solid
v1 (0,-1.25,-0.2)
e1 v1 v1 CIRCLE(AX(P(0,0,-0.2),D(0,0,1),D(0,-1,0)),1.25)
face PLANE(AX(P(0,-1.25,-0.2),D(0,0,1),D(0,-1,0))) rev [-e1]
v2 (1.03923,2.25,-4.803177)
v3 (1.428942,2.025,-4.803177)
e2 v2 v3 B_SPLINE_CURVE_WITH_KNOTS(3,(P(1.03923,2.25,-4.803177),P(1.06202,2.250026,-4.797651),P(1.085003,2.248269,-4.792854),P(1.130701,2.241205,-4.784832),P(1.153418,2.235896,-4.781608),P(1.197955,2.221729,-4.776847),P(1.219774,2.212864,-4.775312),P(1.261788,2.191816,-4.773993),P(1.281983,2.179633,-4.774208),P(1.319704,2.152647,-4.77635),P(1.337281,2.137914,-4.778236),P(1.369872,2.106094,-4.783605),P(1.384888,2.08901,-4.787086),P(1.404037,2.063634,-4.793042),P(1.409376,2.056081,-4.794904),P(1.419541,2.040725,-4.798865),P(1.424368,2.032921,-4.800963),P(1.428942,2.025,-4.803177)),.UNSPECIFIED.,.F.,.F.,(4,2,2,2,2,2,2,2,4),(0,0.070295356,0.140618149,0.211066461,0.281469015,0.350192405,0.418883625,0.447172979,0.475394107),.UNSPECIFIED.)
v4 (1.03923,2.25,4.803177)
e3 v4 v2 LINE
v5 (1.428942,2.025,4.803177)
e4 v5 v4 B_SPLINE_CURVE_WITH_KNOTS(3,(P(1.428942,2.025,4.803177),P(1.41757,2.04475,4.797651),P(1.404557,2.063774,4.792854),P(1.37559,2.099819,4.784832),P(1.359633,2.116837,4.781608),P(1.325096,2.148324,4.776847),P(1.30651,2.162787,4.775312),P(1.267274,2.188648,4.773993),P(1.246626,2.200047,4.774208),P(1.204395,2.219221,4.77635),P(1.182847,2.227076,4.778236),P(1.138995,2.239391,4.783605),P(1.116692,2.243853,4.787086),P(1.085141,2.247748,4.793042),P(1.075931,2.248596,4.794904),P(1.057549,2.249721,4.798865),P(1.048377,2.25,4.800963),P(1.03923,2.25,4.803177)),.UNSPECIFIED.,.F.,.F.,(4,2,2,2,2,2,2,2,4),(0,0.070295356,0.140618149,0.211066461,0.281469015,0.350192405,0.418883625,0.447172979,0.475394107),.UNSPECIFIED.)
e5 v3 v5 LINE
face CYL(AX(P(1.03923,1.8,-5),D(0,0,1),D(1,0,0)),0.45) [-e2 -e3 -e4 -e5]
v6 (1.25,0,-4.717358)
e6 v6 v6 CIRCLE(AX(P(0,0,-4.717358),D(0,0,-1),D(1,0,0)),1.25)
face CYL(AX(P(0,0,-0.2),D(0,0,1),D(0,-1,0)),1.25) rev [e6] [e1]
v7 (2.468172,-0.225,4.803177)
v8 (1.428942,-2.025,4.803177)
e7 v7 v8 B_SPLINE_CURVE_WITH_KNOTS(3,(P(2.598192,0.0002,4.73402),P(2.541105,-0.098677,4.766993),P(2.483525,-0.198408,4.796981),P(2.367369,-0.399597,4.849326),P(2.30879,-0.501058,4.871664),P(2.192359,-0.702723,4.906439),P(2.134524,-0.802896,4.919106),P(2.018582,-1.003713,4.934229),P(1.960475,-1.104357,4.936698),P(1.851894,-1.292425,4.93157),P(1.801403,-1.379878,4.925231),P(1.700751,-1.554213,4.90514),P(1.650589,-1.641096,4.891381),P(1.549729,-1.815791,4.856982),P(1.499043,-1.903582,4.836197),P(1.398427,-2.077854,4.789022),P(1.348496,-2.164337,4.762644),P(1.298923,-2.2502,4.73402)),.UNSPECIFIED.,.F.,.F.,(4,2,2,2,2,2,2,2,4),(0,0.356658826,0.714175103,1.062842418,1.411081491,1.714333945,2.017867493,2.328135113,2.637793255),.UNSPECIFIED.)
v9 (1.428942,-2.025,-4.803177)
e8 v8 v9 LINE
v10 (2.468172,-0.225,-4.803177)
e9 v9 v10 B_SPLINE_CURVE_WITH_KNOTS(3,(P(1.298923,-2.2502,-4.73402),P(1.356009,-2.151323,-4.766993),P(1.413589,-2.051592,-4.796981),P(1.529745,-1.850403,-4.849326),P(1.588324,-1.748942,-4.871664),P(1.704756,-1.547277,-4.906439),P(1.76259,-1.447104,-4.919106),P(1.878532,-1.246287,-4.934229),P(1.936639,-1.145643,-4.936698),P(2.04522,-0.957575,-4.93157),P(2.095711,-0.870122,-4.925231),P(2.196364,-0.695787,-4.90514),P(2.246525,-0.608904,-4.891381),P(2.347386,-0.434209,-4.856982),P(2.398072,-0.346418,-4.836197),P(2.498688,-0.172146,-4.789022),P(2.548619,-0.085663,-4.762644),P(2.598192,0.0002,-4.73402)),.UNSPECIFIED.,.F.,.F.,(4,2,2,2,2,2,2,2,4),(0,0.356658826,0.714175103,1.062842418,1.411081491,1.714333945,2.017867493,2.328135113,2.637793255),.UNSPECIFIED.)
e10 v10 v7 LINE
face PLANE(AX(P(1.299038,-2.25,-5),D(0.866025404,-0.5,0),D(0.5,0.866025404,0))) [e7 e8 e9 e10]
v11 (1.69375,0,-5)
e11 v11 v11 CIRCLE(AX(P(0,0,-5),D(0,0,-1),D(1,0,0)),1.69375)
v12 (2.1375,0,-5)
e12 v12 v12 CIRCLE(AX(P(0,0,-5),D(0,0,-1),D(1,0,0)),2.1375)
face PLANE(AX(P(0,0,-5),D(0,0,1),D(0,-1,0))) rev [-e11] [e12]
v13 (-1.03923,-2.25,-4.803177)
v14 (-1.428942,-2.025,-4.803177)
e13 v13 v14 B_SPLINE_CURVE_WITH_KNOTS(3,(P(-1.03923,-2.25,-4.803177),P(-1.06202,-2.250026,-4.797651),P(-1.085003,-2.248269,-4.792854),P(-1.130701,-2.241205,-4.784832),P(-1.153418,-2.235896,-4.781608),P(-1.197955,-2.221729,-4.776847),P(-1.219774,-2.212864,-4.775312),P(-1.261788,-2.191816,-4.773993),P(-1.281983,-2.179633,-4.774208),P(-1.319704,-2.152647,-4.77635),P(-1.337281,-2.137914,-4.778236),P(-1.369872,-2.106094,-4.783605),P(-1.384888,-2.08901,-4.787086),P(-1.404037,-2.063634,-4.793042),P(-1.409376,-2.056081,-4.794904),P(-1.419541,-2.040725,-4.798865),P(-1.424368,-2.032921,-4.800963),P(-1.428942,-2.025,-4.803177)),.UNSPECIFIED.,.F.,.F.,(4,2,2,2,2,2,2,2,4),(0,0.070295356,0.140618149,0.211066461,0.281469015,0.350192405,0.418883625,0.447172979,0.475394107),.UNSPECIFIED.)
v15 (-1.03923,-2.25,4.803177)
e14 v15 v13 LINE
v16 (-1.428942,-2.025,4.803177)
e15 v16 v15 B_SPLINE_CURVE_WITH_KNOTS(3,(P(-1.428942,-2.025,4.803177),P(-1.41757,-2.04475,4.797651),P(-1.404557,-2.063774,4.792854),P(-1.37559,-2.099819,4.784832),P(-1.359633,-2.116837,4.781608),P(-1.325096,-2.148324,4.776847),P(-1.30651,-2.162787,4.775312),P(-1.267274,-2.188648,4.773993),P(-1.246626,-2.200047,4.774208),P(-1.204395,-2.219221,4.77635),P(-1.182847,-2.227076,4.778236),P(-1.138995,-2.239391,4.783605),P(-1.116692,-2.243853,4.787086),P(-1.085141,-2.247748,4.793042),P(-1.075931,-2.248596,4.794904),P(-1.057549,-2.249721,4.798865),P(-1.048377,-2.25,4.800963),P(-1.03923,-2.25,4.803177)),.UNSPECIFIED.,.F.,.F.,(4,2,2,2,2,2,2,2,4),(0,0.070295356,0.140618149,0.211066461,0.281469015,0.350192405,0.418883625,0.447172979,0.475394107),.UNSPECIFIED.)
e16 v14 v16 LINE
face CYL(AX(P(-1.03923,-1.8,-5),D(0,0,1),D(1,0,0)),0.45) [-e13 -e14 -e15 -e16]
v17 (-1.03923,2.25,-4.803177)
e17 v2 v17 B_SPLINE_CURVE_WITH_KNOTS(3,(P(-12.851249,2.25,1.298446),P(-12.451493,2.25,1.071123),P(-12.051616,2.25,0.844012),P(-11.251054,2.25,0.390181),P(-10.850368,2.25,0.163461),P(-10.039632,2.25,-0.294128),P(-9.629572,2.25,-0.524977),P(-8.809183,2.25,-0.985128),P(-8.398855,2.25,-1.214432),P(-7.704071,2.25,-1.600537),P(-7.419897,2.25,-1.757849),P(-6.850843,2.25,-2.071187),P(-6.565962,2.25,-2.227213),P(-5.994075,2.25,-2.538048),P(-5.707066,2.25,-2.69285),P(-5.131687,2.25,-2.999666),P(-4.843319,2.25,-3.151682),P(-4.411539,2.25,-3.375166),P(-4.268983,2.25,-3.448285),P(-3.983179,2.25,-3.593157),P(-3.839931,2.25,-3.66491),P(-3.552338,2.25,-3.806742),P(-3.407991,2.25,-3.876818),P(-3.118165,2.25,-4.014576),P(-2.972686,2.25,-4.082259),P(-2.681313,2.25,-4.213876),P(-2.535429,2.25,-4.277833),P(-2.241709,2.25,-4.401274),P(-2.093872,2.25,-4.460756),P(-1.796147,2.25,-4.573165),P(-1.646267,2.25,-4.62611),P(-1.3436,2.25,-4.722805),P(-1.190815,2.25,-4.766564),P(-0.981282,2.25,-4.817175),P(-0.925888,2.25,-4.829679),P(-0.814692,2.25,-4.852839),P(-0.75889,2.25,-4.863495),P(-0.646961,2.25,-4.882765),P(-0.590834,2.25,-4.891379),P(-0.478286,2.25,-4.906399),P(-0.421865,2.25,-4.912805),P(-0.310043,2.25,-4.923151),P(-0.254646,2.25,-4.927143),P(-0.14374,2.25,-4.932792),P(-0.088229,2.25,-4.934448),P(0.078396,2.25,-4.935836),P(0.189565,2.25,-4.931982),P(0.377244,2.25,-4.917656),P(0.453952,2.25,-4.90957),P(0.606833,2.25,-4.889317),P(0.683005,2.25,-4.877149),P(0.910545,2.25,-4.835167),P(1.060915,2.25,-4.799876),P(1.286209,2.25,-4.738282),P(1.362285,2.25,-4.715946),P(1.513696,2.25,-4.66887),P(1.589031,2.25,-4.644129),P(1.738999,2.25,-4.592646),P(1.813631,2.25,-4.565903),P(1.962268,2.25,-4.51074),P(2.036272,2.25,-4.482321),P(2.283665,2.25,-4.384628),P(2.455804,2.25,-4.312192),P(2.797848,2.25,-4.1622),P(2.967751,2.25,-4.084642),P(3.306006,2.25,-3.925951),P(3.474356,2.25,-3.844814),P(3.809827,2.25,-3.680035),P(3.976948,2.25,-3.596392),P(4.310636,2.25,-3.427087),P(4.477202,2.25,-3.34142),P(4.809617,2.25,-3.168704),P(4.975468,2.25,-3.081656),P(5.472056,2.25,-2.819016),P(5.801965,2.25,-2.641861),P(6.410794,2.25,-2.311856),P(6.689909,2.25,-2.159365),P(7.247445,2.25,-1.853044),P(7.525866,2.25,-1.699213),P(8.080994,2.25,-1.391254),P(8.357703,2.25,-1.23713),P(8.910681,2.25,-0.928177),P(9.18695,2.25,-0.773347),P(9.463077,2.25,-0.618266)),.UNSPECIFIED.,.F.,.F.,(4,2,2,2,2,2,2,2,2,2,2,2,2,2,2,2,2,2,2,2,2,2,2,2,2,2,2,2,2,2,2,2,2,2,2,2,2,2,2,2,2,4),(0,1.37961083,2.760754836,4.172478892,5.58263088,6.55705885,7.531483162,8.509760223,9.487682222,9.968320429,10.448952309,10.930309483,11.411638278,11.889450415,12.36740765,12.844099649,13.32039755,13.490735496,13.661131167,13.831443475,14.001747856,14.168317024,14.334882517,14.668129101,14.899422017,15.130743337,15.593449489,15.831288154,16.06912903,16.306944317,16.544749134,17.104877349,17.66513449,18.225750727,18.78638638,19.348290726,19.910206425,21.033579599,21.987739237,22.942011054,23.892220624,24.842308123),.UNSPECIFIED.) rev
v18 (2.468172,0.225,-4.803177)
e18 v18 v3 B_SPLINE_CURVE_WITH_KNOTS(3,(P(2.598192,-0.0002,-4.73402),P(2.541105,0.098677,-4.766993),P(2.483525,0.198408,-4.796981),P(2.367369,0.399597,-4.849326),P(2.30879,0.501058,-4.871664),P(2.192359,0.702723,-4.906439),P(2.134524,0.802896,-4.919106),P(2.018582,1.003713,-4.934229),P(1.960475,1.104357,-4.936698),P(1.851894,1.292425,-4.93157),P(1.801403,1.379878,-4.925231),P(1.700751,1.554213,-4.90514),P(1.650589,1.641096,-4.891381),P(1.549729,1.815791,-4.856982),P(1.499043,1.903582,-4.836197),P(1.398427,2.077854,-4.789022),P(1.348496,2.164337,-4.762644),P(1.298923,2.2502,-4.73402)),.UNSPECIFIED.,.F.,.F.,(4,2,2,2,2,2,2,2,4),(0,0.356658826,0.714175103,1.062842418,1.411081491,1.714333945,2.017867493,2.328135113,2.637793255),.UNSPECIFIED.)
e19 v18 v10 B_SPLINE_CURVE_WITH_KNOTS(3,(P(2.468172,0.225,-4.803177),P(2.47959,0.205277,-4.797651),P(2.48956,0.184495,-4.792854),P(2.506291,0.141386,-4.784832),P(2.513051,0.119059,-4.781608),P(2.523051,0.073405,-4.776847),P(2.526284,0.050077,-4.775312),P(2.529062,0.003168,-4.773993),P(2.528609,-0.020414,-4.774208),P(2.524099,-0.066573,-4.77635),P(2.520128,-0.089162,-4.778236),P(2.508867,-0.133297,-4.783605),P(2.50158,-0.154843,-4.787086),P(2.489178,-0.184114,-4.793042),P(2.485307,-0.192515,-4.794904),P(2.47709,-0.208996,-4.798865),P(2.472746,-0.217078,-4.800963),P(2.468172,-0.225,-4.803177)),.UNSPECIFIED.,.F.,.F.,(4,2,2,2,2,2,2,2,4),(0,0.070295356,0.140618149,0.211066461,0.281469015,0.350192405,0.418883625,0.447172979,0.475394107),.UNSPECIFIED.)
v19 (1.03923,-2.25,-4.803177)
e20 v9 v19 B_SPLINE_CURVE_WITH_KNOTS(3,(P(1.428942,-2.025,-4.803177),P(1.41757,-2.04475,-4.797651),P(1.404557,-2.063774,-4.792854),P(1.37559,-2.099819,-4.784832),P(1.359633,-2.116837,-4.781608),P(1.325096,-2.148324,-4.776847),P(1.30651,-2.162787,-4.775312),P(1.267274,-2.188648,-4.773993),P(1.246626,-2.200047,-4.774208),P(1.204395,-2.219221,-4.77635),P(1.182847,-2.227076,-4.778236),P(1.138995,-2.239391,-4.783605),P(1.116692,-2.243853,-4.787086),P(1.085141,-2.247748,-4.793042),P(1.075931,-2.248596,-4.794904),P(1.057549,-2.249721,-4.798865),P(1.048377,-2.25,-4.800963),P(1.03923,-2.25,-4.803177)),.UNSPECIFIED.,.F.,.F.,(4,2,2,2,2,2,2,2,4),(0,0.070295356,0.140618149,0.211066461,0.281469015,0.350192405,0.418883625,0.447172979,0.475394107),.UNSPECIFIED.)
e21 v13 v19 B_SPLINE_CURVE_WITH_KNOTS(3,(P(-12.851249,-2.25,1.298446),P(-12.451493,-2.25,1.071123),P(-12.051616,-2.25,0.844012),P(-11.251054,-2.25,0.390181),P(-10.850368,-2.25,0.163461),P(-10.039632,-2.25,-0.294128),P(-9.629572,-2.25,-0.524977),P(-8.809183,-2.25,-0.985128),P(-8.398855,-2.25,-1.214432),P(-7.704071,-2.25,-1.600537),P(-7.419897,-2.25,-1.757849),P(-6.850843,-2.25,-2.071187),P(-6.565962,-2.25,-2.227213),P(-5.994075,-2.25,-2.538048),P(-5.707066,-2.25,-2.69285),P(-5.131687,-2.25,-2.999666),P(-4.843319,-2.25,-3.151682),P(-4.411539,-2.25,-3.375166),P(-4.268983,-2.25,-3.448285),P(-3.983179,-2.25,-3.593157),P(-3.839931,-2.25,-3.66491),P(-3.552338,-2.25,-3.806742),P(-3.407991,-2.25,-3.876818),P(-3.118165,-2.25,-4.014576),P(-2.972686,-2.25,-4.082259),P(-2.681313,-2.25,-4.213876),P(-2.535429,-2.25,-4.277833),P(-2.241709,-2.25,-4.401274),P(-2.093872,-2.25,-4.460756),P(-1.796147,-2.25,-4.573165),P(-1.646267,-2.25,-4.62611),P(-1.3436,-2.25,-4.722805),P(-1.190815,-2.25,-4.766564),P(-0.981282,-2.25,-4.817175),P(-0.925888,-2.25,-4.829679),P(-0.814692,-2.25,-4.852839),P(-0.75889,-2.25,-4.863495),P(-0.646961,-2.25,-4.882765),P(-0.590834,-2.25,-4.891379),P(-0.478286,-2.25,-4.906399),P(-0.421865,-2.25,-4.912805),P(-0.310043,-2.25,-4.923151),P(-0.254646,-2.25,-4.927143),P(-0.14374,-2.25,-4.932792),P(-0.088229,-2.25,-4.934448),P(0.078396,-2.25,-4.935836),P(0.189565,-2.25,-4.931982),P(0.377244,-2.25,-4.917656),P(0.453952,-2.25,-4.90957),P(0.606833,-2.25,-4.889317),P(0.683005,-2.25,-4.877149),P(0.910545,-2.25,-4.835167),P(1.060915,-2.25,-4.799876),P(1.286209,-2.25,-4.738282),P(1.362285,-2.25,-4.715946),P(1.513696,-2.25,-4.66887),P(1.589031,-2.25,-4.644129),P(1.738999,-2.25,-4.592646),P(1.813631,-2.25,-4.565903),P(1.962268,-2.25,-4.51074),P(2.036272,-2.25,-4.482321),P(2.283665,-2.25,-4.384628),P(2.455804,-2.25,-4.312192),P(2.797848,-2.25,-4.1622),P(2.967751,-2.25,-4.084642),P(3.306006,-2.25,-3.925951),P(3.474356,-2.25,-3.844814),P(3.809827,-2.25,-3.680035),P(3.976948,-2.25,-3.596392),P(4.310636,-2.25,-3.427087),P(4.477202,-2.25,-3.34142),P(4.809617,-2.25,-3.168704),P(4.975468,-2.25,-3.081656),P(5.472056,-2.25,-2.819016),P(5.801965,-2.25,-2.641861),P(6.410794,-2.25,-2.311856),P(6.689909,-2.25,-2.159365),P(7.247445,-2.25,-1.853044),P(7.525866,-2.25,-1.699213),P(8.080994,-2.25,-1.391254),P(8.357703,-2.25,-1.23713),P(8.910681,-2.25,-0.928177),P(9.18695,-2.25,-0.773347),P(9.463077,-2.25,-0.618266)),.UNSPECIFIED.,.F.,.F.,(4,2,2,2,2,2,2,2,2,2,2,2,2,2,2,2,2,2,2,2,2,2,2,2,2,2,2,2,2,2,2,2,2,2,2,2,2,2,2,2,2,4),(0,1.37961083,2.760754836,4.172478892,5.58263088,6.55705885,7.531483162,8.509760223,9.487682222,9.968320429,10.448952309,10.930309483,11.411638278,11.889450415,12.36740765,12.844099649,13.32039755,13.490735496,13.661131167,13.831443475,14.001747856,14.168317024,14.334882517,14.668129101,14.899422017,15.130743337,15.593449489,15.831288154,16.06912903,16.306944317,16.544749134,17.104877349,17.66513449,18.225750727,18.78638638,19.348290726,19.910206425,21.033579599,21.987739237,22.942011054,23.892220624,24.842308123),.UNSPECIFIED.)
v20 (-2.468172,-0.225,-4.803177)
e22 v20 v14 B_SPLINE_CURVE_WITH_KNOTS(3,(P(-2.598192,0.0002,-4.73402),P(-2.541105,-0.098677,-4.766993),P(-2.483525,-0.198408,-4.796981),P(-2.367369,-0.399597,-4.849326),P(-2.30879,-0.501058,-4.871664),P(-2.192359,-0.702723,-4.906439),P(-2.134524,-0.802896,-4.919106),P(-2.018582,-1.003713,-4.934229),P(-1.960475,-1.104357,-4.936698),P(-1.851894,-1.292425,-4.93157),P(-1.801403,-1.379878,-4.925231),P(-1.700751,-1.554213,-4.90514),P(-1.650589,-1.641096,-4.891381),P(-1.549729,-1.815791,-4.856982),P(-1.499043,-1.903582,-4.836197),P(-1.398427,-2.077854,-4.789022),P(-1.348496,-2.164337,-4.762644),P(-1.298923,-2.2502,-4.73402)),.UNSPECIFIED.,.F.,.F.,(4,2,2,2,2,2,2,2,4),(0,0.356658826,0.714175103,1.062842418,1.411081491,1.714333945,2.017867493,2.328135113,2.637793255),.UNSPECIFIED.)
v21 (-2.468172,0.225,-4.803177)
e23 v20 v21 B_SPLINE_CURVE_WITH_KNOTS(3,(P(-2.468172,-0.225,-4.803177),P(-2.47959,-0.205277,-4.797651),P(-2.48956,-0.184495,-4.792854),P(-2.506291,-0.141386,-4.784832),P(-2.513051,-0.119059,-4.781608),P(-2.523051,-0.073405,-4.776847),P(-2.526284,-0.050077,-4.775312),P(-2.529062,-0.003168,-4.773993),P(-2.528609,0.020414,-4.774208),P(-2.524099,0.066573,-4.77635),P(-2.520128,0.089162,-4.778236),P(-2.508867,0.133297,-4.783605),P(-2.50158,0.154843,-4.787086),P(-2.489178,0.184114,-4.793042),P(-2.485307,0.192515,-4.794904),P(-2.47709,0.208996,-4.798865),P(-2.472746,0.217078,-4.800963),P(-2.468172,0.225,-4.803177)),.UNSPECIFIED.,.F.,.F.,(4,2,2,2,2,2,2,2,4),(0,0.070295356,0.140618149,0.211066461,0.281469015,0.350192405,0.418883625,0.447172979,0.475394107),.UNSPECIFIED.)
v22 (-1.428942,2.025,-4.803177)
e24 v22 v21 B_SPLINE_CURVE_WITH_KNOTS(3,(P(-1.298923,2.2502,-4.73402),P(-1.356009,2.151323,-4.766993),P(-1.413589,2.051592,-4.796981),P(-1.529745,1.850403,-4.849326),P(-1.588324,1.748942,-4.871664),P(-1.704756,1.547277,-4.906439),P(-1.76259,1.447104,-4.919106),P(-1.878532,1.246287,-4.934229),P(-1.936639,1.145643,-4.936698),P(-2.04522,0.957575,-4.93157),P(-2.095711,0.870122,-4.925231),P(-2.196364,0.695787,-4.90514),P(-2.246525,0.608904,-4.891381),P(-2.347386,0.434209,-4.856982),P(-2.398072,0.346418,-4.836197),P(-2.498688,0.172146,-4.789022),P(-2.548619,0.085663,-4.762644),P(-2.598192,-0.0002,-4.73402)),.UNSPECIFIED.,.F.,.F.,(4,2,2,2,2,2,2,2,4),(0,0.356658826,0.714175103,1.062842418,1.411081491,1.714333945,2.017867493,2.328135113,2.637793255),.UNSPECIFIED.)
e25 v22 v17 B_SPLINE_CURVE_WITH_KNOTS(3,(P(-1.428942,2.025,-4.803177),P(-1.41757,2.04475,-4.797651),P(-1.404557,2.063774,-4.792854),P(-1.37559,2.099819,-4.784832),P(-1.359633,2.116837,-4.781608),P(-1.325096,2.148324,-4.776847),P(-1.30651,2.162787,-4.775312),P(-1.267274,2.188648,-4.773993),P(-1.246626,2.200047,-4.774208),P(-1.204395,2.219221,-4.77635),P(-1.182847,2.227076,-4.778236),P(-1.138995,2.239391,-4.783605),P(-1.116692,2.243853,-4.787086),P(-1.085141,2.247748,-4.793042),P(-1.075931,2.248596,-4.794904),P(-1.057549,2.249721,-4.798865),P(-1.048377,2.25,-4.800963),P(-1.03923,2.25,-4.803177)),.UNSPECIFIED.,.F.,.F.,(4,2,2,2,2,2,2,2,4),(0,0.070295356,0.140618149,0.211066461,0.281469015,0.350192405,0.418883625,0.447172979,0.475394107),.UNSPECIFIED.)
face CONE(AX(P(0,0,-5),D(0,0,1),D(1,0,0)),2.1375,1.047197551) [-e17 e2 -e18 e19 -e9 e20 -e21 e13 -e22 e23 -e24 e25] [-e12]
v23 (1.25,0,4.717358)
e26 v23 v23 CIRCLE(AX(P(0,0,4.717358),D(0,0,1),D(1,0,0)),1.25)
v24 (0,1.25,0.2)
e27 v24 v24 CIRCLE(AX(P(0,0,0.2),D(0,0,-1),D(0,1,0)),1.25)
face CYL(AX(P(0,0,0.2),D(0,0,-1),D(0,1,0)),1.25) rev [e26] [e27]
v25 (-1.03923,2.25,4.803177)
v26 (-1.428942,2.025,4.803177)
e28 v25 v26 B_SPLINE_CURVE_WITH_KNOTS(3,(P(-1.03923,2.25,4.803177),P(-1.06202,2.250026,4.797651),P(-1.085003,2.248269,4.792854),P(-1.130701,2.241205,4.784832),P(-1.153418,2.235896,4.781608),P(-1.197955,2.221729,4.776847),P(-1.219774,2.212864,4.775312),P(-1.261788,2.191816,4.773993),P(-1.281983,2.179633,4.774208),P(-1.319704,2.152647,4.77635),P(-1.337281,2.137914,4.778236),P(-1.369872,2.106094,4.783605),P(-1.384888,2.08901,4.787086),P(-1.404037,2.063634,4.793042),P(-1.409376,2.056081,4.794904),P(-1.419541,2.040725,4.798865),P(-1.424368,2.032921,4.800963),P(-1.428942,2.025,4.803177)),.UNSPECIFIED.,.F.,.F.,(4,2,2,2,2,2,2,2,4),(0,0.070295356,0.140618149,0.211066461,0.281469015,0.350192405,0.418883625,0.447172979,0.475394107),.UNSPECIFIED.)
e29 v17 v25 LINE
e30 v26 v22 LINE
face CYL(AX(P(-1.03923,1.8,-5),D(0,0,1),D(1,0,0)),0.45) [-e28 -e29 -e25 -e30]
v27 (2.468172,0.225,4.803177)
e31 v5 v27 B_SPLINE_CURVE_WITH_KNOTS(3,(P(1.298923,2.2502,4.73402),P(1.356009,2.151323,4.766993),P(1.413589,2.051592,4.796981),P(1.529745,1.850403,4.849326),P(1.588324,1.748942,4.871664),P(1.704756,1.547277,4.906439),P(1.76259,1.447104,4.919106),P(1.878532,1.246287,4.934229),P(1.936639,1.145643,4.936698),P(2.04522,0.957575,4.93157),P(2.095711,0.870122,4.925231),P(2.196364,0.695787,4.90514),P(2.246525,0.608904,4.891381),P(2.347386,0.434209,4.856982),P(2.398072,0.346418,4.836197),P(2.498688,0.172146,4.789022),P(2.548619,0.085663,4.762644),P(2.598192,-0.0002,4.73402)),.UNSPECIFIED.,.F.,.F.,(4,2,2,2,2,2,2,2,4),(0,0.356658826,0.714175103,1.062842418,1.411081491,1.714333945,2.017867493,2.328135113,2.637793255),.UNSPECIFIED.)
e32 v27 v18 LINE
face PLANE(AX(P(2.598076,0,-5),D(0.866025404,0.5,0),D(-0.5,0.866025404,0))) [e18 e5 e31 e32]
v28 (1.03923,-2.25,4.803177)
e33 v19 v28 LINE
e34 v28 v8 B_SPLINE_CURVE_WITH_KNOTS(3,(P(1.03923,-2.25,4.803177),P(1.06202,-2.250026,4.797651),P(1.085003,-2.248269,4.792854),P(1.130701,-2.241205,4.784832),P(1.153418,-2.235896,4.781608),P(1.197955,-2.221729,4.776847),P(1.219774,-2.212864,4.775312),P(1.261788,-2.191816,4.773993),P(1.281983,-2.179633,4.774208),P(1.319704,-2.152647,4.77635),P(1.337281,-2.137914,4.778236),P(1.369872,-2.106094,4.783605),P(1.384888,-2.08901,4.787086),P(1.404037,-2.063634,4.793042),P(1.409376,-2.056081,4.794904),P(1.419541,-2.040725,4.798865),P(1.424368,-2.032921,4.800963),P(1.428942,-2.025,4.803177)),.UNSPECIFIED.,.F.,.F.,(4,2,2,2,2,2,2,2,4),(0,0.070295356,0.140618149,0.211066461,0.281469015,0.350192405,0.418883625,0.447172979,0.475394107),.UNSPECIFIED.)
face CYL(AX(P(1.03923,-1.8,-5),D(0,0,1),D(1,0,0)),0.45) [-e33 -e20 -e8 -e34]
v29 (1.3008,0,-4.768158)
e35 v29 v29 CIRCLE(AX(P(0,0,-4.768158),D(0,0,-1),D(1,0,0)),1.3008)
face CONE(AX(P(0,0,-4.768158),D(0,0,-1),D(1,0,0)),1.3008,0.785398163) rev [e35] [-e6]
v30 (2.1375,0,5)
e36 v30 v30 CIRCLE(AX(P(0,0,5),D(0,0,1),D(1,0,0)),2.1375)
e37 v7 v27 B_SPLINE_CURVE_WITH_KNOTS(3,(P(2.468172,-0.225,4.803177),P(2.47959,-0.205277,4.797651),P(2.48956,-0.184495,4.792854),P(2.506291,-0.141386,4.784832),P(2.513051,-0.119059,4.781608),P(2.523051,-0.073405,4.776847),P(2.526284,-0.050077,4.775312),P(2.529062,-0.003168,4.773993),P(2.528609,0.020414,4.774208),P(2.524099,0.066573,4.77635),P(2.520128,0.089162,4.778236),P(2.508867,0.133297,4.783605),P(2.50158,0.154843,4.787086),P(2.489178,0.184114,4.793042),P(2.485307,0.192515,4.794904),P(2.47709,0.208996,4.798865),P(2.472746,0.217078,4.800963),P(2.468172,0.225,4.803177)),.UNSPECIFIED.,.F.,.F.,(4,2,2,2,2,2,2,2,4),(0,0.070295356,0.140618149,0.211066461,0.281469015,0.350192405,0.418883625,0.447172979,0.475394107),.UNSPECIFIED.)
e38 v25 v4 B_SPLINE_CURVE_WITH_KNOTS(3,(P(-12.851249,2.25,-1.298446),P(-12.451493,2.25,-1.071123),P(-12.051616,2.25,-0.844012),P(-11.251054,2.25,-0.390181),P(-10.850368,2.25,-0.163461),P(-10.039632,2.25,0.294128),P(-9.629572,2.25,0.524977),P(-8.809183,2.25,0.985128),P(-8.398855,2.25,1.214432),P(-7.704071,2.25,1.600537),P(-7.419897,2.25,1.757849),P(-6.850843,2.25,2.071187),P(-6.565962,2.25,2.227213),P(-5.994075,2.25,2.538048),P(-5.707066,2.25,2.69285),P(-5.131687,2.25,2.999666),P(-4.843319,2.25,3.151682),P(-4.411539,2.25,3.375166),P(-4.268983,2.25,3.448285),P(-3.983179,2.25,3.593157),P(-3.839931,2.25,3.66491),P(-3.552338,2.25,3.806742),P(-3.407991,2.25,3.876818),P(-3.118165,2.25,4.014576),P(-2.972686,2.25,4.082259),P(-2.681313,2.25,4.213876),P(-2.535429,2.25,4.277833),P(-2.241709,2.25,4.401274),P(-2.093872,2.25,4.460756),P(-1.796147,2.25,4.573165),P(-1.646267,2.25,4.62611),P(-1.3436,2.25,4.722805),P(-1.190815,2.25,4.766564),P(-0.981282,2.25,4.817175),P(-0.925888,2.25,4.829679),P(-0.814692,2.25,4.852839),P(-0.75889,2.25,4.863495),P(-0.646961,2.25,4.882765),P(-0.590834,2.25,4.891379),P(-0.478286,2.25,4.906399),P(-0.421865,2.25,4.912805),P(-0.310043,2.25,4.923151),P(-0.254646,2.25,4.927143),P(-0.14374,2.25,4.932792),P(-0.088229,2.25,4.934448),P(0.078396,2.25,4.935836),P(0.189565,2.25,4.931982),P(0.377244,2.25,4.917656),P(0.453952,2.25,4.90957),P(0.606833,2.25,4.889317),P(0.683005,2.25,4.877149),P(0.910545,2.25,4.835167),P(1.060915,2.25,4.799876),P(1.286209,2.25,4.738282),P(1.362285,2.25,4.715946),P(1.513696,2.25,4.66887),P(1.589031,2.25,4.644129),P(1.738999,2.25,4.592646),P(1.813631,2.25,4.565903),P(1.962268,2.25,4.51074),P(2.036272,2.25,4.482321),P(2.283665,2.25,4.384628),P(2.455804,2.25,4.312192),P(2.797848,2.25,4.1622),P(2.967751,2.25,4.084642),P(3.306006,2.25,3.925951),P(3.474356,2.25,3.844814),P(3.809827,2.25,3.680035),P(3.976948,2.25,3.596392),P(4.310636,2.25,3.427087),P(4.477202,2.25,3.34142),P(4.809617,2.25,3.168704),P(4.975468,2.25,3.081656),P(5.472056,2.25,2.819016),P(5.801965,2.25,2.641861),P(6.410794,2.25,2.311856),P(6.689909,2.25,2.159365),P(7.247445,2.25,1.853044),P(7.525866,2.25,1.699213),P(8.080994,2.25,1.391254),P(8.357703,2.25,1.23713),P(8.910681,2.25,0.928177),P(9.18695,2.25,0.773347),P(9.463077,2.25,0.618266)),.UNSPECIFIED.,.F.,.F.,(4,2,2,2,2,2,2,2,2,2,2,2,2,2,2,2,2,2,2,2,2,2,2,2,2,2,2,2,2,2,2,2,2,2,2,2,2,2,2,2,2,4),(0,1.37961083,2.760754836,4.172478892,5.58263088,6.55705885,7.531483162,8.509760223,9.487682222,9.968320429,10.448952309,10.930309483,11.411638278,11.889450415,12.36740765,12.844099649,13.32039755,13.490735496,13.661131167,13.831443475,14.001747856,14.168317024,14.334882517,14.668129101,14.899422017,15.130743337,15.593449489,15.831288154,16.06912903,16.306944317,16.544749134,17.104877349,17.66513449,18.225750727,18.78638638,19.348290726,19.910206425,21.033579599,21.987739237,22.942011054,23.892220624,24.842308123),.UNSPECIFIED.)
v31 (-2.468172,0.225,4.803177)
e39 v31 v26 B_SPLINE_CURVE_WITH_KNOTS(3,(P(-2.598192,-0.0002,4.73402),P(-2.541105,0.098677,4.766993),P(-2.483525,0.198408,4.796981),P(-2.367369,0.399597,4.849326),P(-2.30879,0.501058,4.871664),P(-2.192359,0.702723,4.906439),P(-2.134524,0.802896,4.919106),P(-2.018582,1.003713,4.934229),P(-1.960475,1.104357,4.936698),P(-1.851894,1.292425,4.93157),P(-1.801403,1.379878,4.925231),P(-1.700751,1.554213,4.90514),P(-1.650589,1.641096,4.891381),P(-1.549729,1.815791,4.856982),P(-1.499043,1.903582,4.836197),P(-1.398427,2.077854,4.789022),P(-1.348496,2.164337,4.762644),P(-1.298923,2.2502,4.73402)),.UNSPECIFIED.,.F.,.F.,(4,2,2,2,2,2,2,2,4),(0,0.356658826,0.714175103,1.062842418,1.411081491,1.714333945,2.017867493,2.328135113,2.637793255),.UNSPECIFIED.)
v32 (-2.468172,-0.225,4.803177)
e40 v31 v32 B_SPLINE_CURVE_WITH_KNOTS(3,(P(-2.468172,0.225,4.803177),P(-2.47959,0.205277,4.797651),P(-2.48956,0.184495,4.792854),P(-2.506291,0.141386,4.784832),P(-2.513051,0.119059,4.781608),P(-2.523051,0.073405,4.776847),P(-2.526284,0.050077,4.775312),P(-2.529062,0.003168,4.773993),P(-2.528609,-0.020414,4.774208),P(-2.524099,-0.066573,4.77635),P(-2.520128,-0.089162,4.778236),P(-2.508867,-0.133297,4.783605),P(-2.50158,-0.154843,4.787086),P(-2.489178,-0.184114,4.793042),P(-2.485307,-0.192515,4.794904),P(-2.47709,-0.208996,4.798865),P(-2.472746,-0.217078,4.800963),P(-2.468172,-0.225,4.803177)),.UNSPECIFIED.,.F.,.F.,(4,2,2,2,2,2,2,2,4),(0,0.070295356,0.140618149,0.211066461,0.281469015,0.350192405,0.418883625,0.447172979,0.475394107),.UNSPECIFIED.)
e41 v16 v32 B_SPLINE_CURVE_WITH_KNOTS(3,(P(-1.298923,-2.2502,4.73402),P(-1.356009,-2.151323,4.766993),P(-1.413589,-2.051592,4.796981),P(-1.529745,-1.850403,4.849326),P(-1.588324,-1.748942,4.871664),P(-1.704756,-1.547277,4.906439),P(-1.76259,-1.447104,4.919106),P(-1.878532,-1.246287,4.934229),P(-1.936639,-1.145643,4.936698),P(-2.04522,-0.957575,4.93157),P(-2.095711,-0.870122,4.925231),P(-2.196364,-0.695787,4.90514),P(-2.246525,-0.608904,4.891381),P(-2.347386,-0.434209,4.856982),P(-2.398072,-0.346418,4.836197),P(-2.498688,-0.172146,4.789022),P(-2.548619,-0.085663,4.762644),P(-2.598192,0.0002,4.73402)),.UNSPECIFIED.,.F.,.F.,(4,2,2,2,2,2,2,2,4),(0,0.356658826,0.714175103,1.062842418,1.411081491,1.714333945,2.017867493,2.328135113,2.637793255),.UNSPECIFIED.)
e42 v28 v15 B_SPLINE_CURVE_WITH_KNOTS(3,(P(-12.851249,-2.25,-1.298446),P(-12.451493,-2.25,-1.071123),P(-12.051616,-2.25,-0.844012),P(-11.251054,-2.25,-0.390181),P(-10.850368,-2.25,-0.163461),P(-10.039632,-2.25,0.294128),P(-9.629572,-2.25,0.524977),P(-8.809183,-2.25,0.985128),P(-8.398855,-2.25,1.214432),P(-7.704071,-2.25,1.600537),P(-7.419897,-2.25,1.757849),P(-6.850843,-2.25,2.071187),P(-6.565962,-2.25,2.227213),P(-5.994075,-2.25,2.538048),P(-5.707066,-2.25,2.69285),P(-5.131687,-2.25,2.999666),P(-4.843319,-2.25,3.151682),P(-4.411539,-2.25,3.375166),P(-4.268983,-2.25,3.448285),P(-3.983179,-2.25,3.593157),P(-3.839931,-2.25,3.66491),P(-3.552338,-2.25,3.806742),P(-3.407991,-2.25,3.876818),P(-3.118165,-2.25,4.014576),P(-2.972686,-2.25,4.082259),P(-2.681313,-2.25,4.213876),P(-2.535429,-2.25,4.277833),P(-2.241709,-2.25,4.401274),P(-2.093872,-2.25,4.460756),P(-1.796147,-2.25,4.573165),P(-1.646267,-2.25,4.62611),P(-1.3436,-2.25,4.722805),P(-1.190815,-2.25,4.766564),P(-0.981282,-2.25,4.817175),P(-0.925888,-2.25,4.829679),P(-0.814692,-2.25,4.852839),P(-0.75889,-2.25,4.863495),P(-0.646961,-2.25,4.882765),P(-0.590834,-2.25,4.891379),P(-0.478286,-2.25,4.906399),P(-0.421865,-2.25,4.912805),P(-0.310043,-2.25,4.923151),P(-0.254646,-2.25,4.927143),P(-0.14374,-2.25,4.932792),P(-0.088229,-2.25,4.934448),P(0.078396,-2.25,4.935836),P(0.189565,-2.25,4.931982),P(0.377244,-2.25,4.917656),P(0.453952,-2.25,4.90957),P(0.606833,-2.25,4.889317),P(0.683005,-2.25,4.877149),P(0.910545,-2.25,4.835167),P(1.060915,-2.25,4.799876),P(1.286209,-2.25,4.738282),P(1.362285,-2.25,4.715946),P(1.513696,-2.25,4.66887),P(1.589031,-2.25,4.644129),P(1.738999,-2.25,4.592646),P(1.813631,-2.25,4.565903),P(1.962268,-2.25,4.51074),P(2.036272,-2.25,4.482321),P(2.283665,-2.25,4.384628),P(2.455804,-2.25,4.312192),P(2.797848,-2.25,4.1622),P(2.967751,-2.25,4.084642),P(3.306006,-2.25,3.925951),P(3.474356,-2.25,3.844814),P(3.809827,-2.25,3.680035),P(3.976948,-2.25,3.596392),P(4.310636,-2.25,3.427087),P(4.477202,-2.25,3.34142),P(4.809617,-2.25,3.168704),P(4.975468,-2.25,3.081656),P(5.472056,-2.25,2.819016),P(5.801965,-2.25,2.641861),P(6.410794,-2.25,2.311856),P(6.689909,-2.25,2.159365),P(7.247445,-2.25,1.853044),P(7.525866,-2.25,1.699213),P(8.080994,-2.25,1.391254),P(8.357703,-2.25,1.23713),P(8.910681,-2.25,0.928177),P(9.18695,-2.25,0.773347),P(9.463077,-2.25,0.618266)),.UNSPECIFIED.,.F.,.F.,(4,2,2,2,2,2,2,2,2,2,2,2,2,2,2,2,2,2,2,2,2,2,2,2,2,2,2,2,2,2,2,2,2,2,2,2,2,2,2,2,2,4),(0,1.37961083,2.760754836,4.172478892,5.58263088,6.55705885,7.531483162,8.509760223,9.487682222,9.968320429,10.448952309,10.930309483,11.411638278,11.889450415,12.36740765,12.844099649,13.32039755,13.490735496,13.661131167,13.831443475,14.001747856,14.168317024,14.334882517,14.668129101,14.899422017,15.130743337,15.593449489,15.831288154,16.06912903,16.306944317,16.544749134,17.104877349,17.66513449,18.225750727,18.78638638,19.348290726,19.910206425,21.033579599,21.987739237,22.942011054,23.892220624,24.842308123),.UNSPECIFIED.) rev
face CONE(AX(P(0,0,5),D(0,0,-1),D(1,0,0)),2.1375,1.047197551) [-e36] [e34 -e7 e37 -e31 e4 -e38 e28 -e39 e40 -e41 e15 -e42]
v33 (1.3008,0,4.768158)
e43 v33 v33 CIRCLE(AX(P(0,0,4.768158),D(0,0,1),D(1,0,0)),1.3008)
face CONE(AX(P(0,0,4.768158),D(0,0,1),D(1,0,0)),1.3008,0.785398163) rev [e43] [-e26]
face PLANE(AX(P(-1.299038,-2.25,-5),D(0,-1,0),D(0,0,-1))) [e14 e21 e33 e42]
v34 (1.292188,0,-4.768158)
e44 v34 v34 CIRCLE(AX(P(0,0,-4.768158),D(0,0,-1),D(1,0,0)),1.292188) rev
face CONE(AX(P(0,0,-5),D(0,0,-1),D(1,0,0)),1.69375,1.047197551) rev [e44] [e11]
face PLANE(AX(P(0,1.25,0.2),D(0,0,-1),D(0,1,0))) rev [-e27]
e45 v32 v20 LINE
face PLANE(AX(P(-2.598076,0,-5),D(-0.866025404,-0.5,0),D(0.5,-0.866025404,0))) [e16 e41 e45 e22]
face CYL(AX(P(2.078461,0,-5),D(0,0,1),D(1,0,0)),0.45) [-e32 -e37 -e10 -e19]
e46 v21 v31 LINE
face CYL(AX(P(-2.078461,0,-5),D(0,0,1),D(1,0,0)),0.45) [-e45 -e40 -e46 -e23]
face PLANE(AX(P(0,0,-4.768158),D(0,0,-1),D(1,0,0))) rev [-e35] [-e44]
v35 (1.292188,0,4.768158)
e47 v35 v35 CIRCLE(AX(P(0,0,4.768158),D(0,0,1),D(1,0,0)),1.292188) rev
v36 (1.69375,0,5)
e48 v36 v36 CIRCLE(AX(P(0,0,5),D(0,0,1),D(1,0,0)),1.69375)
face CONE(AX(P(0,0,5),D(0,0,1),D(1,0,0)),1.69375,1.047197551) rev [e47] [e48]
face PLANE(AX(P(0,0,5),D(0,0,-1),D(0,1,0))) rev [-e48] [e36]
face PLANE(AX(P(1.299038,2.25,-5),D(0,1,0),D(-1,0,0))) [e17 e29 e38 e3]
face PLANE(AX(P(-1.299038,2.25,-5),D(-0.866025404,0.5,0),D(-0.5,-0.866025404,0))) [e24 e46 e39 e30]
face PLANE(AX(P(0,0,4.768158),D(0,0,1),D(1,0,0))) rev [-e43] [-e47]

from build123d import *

# Parameters (mm, degrees)
SKETCH4_R           = 1.75
BOSS_EXTRUDE1_DEPTH = 5
SKETCH5_OUTSIDE_W   = 49.716
SKETCH5_OUTSIDE_H   = 49.02
SKETCH5_OUTSIDE_R   = 2.1375
CUT_EXTRUDE1_DEPTH  = 11.574142991
CUT_EXTRUDE1_DRAFT  = -60
SKETCH6_OUTSIDE_W   = 49.716
SKETCH6_OUTSIDE_H   = 49.02
SKETCH6_OUTSIDE_R   = 2.1375
CUT_EXTRUDE2_DEPTH  = 11.574142991
CUT_EXTRUDE2_DRAFT  = -60
FILLET1_R           = 0.45
BOSS_EXTRUDE2_START = -5
SKETCH7_R           = 1.69375
BOSS_EXTRUDE2_DEPTH = 4.8
SKETCH8_W           = 4.8
SKETCH8_H           = 1.25
CIRPATTERN1_COUNT   = 2


with BuildPart() as part:
    # Sketch3 → Revolve1 (revolve)
    with BuildSketch(Plane(origin=(0, 0, 0), x_dir=(0, 0, -1), z_dir=(1, 0, 0))):
        Polygon((-4.743800818, 1.25), (-0.2, 1.25), (-0.2, 0), (0.2, 0), (0.2, 1.25), (4.743800818, 1.25), (5, 1.69375), (5, 2.25), (0, 2.25), (-5, 2.25), (-5, 1.69375), align=None)
        Polygon((-4.743800818, 1.25), (-0.2, 1.25), (-0.2, 0), (0.2, 0), (0.2, 1.25), (4.743800818, 1.25), (5, 1.69375), (5, 2.25), (0, 2.25), (-5, 2.25), (-5, 1.69375), align=None)
    revolve(axis=Axis((0, 0, 0.2), (0, 0, 1)))

    # Sketch4 → Boss-Extrude1 (add, symmetric)
    with BuildSketch(Plane.XY):
        Polygon((-1.299038106, 2.25), (-2.598076211, 0), (-1.299038106, -2.25), (1.299038106, -2.25), (2.598076211, 0), (1.299038106, 2.25), align=None)
        Circle(SKETCH4_R, mode=Mode.SUBTRACT)
    extrude(amount=BOSS_EXTRUDE1_DEPTH, both=True)


with BuildPart() as cut_extrude1_tool:
    # Sketch5 outside → Cut-Extrude1 (with draft: the straight prism first)
    with BuildSketch(Plane.XY.offset(5)):
        Rectangle(SKETCH5_OUTSIDE_W, SKETCH5_OUTSIDE_H)
        Circle(SKETCH5_OUTSIDE_R, mode=Mode.SUBTRACT)
    extrude(amount=-CUT_EXTRUDE1_DEPTH)
    # Cut-Extrude1: the draft: its side faces are tilted about the plane it starts from
    cut_extrude1_sides = [cut_extrude1_tool.faces().sort_by_distance(p)[0] for p in [
        (0, -24.51, -0.787071496),
        (24.858, 0, -0.787071496),
        (0, 24.51, -0.787071496),
        (-24.858, 0, -0.787071496),
        (-2.1375, 0, -0.787071496),
    ]]
    draft(cut_extrude1_sides, Plane.XY.offset(5), CUT_EXTRUDE1_DRAFT)


with BuildPart() as part_1:
    add(part.part)

    # Cut-Extrude1: cut by cut_extrude1_tool
    add(cut_extrude1_tool.part, mode=Mode.SUBTRACT)


with BuildPart() as cut_extrude2_tool:
    # Sketch6 outside → Cut-Extrude2 (with draft: the straight prism first)
    with BuildSketch(Plane(origin=(0, 0, -5), x_dir=(-1, 0, 0), z_dir=(0, 0, -1))):
        Rectangle(SKETCH6_OUTSIDE_W, SKETCH6_OUTSIDE_H)
        Circle(SKETCH6_OUTSIDE_R, mode=Mode.SUBTRACT)
    extrude(amount=-CUT_EXTRUDE2_DEPTH)
    # Cut-Extrude2: the draft: its side faces are tilted about the plane it starts from
    cut_extrude2_sides = [cut_extrude2_tool.faces().sort_by_distance(p)[0] for p in [
        (0, -24.51, 0.787071496),
        (-24.858, 0, 0.787071496),
        (0, 24.51, 0.787071496),
        (24.858, 0, 0.787071496),
        (2.1375, 0, 0.787071496),
    ]]
    draft(cut_extrude2_sides, Plane(origin=(0, 0, -5), x_dir=(-1, 0, 0), z_dir=(0, 0, -1)), CUT_EXTRUDE2_DRAFT)


with BuildPart() as part_2:
    add(part_1.part)

    # Cut-Extrude2: cut by cut_extrude2_tool
    add(cut_extrude2_tool.part, mode=Mode.SUBTRACT)

    # Fillet1
    # the kernel refuses this fillet: 0.45 mm, written as the material it takes off along each edge
    with BuildSketch(Plane(origin=(1.299038106, 2.25, 5.383605253), x_dir=(-1, 0, 0), z_dir=(0, 0, -1)), Plane(origin=(-1.299038106, 2.25, 5.383605253), x_dir=(-0.49999999999999967, -0.8660254037844387, 0), z_dir=(0, 0, -1))) as fillet1_piece_1:
        with BuildLine():
            CenterArc((FILLET1_R * 0.57735026919, -FILLET1_R), FILLET1_R, 90, 60)
            Line((-FILLET1_R * 0.288675134595, -FILLET1_R * 0.5), (0, 0))
            Line((0, 0), (FILLET1_R * 0.57735026919, 0))
        make_face()
    extrude(amount=10.767210506, mode=Mode.SUBTRACT)
    with BuildSketch(Plane(origin=(-2.598076211, 0, -5.383605253), x_dir=(0.5000000000000006, -0.8660254037844384, 0), z_dir=(0, 0, 1)), Plane(origin=(-1.299038106, -2.25, -5.383605253), x_dir=(1, 0, 0), z_dir=(0, 0, 1)), Plane(origin=(1.299038106, -2.25, -5.383605253), x_dir=(0.49999999999999967, 0.8660254037844387, 0), z_dir=(0, 0, 1)), Plane(origin=(2.598076211, 0, 5.383605253), x_dir=(-0.5, -0.8660254037844388, 0), z_dir=(0, 0, -1))) as fillet1_piece_2:
        with BuildLine():
            CenterArc((FILLET1_R * 0.57735026919, FILLET1_R), FILLET1_R, 210, 60)
            Line((-FILLET1_R * 0.288675134595, FILLET1_R * 0.5), (0, 0))
            Line((0, 0), (FILLET1_R * 0.57735026919, 0))
        make_face()
    extrude(amount=10.767210506, mode=Mode.SUBTRACT)

    # Sketch7 → Boss-Extrude2 (add)
    with BuildSketch(Plane(origin=(0, 0, 0), x_dir=(-1, 0, 0), z_dir=(0, 0, -1)).offset(BOSS_EXTRUDE2_START)):
        Circle(SKETCH7_R)
    extrude(amount=BOSS_EXTRUDE2_DEPTH)

    # SurfaceCut1
    split(bisect_by=Plane.XY, keep=Keep.TOP)


with BuildPart() as body_2:
    # Sketch8 → Revolve2 (revolve)
    with BuildSketch(Plane(origin=(0, 0, 0), x_dir=(0, 0, -1), z_dir=(1, 0, 0))):
        with Locations((-2.6, 0.625)):
            Rectangle(SKETCH8_W, SKETCH8_H)
    revolve(axis=Axis((0, 0, 0.2), (0, 0, 1)))


with BuildPart() as part_3:
    add(part_2.part)

    # Combine1: cut body 2
    add(body_2.part, mode=Mode.SUBTRACT)

    # Cut-Extrude3 cone 1 section (through the dimple's axis) → Cut-Extrude3 (revolve, cut)
    with BuildSketch(Plane(origin=(0, 0, 5), x_dir=(0, -1, 0), z_dir=(1, 0, 0))):
        Polygon((0, 0), (1.69375, 0), (0, 0.977887018), align=None)
    revolve(axis=Axis((0, 0, 5), (0, 0, -1)), mode=Mode.SUBTRACT)

    # Cut-Extrude4 cone 1 section (through the dimple's axis) → Cut-Extrude4 (revolve, cut)
    with BuildSketch(Plane(origin=(0, 0, 4.768157783), x_dir=(0, -1, 0), z_dir=(1, 0, 0))):
        Polygon((0, 0), (1.3008, 0), (0, 1.3008), align=None)
    revolve(axis=Axis((0, 0, 4.768157783), (0, 0, -1)), mode=Mode.SUBTRACT)


with BuildPart() as cirpattern1_1:
    # CirPattern1: pattern copy
    add(part_3.part.rotate(Axis((0, 0, 0), (1, 0, 0)), 1 * 360 / CIRPATTERN1_COUNT))


with BuildPart() as part_4:
    add(part_3.part)

    # Combine2: union CirPattern1_1
    add(cirpattern1_1.part)


solid = part_4.part
